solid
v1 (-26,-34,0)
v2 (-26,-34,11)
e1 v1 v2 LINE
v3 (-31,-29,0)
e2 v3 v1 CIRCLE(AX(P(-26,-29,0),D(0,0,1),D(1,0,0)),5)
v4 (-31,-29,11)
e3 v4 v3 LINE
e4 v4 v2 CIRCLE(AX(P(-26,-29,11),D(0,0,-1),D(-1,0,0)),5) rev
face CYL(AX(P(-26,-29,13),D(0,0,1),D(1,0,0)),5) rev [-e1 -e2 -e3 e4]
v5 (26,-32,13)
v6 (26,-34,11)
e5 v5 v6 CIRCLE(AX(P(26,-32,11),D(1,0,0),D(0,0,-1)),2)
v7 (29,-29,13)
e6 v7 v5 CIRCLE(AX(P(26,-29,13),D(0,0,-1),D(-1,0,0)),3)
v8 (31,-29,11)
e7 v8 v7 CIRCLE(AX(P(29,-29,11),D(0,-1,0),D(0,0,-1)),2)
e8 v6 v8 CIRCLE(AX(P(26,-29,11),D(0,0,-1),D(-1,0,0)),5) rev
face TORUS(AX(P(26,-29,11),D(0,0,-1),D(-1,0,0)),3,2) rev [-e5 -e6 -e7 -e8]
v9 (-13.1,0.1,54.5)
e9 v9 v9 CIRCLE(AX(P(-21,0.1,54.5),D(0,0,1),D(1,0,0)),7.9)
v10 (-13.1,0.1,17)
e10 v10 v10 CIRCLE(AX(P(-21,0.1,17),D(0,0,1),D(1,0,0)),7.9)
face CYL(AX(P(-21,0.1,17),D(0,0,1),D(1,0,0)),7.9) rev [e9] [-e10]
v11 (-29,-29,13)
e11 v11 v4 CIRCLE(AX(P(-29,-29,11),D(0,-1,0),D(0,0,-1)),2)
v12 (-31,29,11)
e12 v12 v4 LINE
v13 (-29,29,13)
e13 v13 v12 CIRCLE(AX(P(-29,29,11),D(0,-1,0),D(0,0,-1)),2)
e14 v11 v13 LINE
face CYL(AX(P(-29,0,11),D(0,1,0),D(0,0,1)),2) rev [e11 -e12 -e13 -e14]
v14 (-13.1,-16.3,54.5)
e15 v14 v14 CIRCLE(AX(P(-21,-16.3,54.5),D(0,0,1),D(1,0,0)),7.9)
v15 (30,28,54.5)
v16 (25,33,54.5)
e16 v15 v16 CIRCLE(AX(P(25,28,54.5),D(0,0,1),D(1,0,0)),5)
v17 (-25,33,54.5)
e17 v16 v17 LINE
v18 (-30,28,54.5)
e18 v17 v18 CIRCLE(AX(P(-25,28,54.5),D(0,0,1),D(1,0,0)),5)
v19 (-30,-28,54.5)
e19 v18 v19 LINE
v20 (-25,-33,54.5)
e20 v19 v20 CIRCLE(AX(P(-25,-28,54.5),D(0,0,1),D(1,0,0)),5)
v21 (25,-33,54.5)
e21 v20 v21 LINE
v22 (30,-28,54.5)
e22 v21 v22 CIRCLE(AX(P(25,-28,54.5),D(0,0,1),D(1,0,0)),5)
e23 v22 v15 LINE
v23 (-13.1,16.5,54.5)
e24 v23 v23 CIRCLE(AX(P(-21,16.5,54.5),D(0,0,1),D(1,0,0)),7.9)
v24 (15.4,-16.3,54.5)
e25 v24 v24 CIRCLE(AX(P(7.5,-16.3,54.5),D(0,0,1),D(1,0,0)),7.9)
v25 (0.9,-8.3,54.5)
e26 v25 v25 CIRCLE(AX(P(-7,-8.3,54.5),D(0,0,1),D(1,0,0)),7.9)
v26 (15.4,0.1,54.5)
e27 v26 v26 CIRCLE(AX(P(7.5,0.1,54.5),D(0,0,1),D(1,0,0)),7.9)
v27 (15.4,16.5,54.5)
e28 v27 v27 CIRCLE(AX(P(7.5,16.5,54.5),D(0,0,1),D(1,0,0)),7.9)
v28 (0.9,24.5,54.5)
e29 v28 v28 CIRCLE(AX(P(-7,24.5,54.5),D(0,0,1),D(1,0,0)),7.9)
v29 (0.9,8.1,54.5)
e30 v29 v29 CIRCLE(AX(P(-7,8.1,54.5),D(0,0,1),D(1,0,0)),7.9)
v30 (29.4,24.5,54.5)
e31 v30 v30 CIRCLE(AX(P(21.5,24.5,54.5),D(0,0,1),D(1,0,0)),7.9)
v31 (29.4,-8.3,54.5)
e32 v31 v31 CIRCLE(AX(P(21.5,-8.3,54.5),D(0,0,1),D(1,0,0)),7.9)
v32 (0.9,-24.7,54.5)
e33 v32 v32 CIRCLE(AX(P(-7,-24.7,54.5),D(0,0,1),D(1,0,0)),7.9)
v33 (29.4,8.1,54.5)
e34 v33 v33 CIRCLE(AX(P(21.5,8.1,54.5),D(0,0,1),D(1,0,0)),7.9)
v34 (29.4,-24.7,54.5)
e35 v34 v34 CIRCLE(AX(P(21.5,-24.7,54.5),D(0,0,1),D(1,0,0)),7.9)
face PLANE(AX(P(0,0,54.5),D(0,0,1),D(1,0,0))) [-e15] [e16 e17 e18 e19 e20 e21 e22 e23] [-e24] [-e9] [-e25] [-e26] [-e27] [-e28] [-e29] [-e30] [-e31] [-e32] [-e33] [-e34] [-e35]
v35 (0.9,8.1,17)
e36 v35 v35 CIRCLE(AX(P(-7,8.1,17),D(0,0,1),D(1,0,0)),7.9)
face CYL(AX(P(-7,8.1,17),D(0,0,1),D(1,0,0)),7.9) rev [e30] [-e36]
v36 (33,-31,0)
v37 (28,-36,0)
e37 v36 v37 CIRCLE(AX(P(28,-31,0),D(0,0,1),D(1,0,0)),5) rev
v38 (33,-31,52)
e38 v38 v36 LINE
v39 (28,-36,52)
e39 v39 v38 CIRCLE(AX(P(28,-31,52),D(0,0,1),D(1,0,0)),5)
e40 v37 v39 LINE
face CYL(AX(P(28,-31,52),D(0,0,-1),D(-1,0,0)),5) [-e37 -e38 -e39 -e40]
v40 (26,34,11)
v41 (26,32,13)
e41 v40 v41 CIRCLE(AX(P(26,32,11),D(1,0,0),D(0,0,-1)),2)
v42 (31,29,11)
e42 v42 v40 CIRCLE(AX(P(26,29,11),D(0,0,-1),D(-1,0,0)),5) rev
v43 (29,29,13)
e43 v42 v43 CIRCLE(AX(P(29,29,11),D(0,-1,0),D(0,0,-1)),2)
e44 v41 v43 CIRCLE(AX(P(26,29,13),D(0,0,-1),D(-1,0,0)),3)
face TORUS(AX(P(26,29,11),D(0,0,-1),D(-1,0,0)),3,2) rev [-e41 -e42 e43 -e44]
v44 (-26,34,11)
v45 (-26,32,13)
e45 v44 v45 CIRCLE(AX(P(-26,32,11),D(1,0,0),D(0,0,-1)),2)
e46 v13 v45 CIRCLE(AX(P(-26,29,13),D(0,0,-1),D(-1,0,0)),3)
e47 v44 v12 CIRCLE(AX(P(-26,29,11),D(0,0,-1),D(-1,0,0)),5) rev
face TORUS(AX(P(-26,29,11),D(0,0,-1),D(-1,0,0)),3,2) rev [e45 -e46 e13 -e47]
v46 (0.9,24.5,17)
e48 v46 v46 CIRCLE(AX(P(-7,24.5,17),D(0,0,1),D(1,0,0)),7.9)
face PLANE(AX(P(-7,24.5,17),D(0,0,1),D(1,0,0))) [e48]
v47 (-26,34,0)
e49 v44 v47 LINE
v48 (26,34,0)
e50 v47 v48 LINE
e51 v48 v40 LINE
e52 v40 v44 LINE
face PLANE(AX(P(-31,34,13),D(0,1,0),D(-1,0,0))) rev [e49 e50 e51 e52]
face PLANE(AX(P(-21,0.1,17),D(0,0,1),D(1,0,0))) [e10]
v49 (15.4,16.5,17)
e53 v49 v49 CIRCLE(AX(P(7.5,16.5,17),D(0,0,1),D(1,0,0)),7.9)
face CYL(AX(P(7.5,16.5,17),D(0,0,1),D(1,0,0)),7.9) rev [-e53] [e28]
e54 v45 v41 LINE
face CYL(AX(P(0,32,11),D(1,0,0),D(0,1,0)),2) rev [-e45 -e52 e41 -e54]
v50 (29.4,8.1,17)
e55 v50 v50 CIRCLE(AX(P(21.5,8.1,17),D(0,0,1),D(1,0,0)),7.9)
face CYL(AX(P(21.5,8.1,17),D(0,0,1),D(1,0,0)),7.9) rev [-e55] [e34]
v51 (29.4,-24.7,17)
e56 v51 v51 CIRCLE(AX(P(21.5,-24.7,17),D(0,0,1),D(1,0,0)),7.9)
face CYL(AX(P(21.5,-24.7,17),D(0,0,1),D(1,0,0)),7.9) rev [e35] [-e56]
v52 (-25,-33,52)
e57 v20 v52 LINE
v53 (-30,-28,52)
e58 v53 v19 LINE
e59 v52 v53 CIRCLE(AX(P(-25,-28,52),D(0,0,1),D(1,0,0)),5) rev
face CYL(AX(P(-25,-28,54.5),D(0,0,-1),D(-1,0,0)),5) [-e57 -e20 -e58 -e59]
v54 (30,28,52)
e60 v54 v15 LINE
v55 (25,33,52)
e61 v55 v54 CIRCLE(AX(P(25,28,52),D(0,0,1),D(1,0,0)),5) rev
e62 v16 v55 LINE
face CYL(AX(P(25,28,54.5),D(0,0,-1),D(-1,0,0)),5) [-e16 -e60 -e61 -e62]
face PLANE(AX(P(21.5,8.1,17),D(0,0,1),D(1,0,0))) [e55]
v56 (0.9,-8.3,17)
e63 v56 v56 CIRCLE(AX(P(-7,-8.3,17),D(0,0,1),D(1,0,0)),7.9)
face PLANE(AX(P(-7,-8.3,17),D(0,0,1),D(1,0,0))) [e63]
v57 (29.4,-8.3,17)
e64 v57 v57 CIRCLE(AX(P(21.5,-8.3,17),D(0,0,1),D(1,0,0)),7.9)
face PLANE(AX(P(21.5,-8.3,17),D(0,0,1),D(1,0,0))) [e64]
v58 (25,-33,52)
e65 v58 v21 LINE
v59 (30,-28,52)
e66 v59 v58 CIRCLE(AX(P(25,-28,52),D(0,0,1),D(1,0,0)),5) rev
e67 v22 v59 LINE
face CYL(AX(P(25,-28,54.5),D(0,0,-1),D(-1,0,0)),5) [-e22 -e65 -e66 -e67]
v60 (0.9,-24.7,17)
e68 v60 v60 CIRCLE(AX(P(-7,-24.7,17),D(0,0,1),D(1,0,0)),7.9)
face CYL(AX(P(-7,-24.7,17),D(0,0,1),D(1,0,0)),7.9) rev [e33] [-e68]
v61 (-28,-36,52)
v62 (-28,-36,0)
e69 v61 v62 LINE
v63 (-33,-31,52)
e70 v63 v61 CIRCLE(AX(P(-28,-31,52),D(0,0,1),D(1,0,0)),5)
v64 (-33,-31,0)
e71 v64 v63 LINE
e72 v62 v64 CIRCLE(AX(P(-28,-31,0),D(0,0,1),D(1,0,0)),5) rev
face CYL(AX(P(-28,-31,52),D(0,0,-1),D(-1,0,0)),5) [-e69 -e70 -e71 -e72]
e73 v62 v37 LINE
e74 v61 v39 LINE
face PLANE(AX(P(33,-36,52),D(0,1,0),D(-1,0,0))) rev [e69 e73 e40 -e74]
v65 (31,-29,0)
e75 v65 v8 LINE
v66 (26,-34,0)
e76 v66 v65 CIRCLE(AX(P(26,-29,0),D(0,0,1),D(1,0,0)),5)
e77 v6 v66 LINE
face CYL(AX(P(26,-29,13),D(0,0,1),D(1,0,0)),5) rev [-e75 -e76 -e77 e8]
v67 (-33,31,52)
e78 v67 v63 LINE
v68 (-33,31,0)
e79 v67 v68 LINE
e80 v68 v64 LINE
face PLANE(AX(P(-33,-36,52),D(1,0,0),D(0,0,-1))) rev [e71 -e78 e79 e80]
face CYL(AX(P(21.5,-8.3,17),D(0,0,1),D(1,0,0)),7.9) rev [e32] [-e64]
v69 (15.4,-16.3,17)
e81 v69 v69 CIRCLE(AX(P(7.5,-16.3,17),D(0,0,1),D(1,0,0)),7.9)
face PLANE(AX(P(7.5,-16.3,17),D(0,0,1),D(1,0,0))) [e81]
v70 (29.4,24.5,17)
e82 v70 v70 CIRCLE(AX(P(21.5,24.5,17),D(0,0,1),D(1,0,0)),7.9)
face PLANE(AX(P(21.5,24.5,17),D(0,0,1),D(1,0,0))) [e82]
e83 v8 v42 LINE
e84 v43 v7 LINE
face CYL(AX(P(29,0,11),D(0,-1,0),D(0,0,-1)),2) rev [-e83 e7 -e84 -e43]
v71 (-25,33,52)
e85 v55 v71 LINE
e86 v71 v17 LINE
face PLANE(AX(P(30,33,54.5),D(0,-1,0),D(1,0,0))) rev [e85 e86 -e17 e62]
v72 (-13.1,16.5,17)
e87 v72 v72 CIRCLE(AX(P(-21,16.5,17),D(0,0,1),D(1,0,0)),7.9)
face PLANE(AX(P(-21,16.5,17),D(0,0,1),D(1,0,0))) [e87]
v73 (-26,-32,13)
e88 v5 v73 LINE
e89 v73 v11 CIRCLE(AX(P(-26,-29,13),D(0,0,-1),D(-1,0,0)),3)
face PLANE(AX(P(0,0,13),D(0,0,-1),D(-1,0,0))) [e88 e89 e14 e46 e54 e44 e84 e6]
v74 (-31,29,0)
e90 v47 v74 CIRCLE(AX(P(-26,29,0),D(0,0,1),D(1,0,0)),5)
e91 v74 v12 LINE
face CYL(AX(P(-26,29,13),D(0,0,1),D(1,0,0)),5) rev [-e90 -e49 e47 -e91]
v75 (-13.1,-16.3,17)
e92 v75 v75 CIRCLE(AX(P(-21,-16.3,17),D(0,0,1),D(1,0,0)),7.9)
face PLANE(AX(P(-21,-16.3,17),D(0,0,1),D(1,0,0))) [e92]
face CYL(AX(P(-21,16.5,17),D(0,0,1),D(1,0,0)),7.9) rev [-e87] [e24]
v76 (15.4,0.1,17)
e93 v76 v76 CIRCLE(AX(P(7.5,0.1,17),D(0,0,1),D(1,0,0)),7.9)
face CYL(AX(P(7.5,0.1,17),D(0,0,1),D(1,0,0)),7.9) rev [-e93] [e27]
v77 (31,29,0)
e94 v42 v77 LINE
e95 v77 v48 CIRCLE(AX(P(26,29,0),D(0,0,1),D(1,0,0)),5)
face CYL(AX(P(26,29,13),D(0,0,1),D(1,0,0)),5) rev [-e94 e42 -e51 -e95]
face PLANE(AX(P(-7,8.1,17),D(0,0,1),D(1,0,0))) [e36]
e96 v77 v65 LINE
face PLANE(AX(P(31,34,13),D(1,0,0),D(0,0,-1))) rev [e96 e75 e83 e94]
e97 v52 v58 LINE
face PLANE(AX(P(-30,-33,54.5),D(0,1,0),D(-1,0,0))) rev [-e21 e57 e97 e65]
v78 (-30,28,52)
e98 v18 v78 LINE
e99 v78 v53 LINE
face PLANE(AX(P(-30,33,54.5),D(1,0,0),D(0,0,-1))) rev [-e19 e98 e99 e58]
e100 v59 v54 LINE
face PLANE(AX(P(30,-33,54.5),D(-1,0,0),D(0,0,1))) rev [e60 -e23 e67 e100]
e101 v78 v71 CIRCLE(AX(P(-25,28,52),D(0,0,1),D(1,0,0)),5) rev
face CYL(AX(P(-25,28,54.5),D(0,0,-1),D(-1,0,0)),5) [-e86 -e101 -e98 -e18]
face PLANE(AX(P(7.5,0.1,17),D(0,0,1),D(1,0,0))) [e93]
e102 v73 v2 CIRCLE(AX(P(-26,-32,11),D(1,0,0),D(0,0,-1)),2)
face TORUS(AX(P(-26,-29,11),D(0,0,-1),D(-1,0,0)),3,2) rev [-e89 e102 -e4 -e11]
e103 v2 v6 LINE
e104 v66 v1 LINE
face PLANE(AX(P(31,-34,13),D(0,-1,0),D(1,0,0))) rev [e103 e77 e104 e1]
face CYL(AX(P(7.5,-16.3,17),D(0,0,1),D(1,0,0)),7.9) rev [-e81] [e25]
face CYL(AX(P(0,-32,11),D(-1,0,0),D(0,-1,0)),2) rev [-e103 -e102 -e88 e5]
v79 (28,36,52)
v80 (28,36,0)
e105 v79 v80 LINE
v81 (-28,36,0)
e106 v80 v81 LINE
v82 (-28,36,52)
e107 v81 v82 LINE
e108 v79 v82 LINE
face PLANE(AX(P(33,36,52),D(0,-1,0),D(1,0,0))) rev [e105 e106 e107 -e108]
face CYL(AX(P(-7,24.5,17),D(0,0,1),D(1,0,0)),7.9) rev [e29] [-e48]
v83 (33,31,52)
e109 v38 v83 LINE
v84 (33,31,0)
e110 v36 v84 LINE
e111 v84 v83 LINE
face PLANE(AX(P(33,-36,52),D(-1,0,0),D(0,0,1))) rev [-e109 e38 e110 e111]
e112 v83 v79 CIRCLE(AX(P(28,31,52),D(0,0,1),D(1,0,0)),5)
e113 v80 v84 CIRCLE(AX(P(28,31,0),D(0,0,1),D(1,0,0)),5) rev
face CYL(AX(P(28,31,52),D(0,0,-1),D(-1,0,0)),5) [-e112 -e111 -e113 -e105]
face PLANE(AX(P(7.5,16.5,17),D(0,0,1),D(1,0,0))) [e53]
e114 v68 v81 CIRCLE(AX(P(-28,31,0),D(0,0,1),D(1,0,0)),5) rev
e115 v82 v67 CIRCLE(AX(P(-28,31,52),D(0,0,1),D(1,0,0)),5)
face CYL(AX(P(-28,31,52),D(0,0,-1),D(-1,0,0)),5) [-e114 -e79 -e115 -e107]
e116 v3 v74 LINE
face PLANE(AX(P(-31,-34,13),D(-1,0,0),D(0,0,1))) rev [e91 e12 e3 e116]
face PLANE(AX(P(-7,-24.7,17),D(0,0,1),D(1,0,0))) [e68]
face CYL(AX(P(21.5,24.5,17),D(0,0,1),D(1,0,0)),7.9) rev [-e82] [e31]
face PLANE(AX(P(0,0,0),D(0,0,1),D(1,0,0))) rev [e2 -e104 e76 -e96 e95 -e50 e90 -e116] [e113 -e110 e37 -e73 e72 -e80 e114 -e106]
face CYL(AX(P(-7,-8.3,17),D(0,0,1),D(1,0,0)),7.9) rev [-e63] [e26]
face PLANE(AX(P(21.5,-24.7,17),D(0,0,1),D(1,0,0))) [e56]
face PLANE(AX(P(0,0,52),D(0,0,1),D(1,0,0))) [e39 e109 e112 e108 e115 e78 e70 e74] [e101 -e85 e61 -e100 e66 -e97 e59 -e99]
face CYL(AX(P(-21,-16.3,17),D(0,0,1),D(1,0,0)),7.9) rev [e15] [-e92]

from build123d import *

# Parameters (mm, degrees)
SKETCH1_W                 = 66
SKETCH1_H                 = 72
BOSS_EXTRUDE1_DEPTH       = 52
SKETCH2_W                 = 60
SKETCH2_H                 = 66
BOSS_EXTRUDE2_DEPTH       = 2.5
SKETCH3_W                 = 62
SKETCH3_H                 = 68
CUT_EXTRUDE1_DEPTH        = 13
SKETCH4_R                 = 7.9
CUT_EXTRUDE2_DEPTH        = 37.5
LPATTERN1_COUNT           = 3
LPATTERN1_PITCH           = 16.4
LPATTERN1_COUNT_DIR2      = 2
LPATTERN1_PITCH_DIR2      = 28.5
SKETCH_PATTERN1_START     = 17
SKETCH_PATTERN1_OUTLINE_R = 7.9
SKETCH_PATTERN1_DEPTH     = 37.5
FILLET1_R                 = 5
FILLET2_R                 = 2


# Read off the part's stored shape, not the designer's step: Sketch-Pattern1
with BuildPart() as part:
    # Sketch1 → Boss-Extrude1 (new body)
    with BuildSketch(Plane.XY):
        Rectangle(SKETCH1_W, SKETCH1_H)
    extrude(amount=BOSS_EXTRUDE1_DEPTH)

    # Sketch2 → Boss-Extrude2 (add)
    with BuildSketch(Plane.XY.offset(52)):
        Rectangle(SKETCH2_W, SKETCH2_H)
    extrude(amount=BOSS_EXTRUDE2_DEPTH)

    # Sketch3 → Cut-Extrude1 (cut)
    with BuildSketch(Plane(origin=(0, 0, 0), x_dir=(-1, 0, 0), z_dir=(0, 0, -1))):
        Rectangle(SKETCH3_W, SKETCH3_H)
    extrude(amount=-CUT_EXTRUDE1_DEPTH, mode=Mode.SUBTRACT)

    # Sketch4 → Cut-Extrude2 (cut)
    with BuildSketch(Plane.XY.offset(54.5)):
        with Locations((21.5, 24.5)):
            Circle(SKETCH4_R)
    cut_extrude2 = extrude(amount=-CUT_EXTRUDE2_DEPTH, mode=Mode.SUBTRACT)

    # LPattern1: Cut-Extrude2 3 × 2
    with Locations(*[(-j * LPATTERN1_PITCH_DIR2, -i * LPATTERN1_PITCH, 0) for i in range(LPATTERN1_COUNT) for j in range(LPATTERN1_COUNT_DIR2) if (i, j) != (0, 0)]):
        add(cut_extrude2, mode=Mode.SUBTRACT)

    # Sketch-Pattern1 outline → Sketch-Pattern1 (cut)
    with BuildSketch(Plane.XY.offset(SKETCH_PATTERN1_START)):
        with Locations((7.5, 16.5)):
            Circle(SKETCH_PATTERN1_OUTLINE_R)
        with Locations((-21, -16.3)):
            Circle(SKETCH_PATTERN1_OUTLINE_R)
        with Locations((-21, 16.5)):
            Circle(SKETCH_PATTERN1_OUTLINE_R)
        with Locations((7.5, 0.1)):
            Circle(SKETCH_PATTERN1_OUTLINE_R)
        with Locations((-21, 0.1)):
            Circle(SKETCH_PATTERN1_OUTLINE_R)
        with Locations((7.5, -16.3)):
            Circle(SKETCH_PATTERN1_OUTLINE_R)
        with Locations((-7, -24.7)):
            Circle(SKETCH_PATTERN1_OUTLINE_R)
        with Locations((21.5, -24.7)):
            Circle(SKETCH_PATTERN1_OUTLINE_R)
    extrude(amount=SKETCH_PATTERN1_DEPTH, mode=Mode.SUBTRACT)

    # Fillet1
    fillet1_edges = [part.edges().sort_by_distance(p)[0] for p in [
        (30, 33, 53.25),
        (-30, 33, 53.25),
        (-30, -33, 53.25),
        (30, -33, 53.25),
        (-31, -34, 6.5),
        (31, -34, 6.5),
        (31, 34, 6.5),
        (-31, 34, 6.5),
        (-33, 36, 26),
        (33, 36, 26),
        (33, -36, 26),
        (-33, -36, 26),
    ]]
    fillet(fillet1_edges, radius=FILLET1_R)

    # Fillet2
    fillet2_edges = [part.edges().sort_by_distance(p)[0] for p in [
        (0, -34, 13),
        (31, 0, 13),
        (-31, 0, 13),
        (0, 34, 13),
        (-29.535533906, 32.535533906, 13),
        (-29.535533906, -32.535533906, 13),
        (29.535533906, 32.535533906, 13),
        (29.535533906, -32.535533906, 13),
    ]]
    fillet(fillet2_edges, radius=FILLET2_R)


solid = part.part
